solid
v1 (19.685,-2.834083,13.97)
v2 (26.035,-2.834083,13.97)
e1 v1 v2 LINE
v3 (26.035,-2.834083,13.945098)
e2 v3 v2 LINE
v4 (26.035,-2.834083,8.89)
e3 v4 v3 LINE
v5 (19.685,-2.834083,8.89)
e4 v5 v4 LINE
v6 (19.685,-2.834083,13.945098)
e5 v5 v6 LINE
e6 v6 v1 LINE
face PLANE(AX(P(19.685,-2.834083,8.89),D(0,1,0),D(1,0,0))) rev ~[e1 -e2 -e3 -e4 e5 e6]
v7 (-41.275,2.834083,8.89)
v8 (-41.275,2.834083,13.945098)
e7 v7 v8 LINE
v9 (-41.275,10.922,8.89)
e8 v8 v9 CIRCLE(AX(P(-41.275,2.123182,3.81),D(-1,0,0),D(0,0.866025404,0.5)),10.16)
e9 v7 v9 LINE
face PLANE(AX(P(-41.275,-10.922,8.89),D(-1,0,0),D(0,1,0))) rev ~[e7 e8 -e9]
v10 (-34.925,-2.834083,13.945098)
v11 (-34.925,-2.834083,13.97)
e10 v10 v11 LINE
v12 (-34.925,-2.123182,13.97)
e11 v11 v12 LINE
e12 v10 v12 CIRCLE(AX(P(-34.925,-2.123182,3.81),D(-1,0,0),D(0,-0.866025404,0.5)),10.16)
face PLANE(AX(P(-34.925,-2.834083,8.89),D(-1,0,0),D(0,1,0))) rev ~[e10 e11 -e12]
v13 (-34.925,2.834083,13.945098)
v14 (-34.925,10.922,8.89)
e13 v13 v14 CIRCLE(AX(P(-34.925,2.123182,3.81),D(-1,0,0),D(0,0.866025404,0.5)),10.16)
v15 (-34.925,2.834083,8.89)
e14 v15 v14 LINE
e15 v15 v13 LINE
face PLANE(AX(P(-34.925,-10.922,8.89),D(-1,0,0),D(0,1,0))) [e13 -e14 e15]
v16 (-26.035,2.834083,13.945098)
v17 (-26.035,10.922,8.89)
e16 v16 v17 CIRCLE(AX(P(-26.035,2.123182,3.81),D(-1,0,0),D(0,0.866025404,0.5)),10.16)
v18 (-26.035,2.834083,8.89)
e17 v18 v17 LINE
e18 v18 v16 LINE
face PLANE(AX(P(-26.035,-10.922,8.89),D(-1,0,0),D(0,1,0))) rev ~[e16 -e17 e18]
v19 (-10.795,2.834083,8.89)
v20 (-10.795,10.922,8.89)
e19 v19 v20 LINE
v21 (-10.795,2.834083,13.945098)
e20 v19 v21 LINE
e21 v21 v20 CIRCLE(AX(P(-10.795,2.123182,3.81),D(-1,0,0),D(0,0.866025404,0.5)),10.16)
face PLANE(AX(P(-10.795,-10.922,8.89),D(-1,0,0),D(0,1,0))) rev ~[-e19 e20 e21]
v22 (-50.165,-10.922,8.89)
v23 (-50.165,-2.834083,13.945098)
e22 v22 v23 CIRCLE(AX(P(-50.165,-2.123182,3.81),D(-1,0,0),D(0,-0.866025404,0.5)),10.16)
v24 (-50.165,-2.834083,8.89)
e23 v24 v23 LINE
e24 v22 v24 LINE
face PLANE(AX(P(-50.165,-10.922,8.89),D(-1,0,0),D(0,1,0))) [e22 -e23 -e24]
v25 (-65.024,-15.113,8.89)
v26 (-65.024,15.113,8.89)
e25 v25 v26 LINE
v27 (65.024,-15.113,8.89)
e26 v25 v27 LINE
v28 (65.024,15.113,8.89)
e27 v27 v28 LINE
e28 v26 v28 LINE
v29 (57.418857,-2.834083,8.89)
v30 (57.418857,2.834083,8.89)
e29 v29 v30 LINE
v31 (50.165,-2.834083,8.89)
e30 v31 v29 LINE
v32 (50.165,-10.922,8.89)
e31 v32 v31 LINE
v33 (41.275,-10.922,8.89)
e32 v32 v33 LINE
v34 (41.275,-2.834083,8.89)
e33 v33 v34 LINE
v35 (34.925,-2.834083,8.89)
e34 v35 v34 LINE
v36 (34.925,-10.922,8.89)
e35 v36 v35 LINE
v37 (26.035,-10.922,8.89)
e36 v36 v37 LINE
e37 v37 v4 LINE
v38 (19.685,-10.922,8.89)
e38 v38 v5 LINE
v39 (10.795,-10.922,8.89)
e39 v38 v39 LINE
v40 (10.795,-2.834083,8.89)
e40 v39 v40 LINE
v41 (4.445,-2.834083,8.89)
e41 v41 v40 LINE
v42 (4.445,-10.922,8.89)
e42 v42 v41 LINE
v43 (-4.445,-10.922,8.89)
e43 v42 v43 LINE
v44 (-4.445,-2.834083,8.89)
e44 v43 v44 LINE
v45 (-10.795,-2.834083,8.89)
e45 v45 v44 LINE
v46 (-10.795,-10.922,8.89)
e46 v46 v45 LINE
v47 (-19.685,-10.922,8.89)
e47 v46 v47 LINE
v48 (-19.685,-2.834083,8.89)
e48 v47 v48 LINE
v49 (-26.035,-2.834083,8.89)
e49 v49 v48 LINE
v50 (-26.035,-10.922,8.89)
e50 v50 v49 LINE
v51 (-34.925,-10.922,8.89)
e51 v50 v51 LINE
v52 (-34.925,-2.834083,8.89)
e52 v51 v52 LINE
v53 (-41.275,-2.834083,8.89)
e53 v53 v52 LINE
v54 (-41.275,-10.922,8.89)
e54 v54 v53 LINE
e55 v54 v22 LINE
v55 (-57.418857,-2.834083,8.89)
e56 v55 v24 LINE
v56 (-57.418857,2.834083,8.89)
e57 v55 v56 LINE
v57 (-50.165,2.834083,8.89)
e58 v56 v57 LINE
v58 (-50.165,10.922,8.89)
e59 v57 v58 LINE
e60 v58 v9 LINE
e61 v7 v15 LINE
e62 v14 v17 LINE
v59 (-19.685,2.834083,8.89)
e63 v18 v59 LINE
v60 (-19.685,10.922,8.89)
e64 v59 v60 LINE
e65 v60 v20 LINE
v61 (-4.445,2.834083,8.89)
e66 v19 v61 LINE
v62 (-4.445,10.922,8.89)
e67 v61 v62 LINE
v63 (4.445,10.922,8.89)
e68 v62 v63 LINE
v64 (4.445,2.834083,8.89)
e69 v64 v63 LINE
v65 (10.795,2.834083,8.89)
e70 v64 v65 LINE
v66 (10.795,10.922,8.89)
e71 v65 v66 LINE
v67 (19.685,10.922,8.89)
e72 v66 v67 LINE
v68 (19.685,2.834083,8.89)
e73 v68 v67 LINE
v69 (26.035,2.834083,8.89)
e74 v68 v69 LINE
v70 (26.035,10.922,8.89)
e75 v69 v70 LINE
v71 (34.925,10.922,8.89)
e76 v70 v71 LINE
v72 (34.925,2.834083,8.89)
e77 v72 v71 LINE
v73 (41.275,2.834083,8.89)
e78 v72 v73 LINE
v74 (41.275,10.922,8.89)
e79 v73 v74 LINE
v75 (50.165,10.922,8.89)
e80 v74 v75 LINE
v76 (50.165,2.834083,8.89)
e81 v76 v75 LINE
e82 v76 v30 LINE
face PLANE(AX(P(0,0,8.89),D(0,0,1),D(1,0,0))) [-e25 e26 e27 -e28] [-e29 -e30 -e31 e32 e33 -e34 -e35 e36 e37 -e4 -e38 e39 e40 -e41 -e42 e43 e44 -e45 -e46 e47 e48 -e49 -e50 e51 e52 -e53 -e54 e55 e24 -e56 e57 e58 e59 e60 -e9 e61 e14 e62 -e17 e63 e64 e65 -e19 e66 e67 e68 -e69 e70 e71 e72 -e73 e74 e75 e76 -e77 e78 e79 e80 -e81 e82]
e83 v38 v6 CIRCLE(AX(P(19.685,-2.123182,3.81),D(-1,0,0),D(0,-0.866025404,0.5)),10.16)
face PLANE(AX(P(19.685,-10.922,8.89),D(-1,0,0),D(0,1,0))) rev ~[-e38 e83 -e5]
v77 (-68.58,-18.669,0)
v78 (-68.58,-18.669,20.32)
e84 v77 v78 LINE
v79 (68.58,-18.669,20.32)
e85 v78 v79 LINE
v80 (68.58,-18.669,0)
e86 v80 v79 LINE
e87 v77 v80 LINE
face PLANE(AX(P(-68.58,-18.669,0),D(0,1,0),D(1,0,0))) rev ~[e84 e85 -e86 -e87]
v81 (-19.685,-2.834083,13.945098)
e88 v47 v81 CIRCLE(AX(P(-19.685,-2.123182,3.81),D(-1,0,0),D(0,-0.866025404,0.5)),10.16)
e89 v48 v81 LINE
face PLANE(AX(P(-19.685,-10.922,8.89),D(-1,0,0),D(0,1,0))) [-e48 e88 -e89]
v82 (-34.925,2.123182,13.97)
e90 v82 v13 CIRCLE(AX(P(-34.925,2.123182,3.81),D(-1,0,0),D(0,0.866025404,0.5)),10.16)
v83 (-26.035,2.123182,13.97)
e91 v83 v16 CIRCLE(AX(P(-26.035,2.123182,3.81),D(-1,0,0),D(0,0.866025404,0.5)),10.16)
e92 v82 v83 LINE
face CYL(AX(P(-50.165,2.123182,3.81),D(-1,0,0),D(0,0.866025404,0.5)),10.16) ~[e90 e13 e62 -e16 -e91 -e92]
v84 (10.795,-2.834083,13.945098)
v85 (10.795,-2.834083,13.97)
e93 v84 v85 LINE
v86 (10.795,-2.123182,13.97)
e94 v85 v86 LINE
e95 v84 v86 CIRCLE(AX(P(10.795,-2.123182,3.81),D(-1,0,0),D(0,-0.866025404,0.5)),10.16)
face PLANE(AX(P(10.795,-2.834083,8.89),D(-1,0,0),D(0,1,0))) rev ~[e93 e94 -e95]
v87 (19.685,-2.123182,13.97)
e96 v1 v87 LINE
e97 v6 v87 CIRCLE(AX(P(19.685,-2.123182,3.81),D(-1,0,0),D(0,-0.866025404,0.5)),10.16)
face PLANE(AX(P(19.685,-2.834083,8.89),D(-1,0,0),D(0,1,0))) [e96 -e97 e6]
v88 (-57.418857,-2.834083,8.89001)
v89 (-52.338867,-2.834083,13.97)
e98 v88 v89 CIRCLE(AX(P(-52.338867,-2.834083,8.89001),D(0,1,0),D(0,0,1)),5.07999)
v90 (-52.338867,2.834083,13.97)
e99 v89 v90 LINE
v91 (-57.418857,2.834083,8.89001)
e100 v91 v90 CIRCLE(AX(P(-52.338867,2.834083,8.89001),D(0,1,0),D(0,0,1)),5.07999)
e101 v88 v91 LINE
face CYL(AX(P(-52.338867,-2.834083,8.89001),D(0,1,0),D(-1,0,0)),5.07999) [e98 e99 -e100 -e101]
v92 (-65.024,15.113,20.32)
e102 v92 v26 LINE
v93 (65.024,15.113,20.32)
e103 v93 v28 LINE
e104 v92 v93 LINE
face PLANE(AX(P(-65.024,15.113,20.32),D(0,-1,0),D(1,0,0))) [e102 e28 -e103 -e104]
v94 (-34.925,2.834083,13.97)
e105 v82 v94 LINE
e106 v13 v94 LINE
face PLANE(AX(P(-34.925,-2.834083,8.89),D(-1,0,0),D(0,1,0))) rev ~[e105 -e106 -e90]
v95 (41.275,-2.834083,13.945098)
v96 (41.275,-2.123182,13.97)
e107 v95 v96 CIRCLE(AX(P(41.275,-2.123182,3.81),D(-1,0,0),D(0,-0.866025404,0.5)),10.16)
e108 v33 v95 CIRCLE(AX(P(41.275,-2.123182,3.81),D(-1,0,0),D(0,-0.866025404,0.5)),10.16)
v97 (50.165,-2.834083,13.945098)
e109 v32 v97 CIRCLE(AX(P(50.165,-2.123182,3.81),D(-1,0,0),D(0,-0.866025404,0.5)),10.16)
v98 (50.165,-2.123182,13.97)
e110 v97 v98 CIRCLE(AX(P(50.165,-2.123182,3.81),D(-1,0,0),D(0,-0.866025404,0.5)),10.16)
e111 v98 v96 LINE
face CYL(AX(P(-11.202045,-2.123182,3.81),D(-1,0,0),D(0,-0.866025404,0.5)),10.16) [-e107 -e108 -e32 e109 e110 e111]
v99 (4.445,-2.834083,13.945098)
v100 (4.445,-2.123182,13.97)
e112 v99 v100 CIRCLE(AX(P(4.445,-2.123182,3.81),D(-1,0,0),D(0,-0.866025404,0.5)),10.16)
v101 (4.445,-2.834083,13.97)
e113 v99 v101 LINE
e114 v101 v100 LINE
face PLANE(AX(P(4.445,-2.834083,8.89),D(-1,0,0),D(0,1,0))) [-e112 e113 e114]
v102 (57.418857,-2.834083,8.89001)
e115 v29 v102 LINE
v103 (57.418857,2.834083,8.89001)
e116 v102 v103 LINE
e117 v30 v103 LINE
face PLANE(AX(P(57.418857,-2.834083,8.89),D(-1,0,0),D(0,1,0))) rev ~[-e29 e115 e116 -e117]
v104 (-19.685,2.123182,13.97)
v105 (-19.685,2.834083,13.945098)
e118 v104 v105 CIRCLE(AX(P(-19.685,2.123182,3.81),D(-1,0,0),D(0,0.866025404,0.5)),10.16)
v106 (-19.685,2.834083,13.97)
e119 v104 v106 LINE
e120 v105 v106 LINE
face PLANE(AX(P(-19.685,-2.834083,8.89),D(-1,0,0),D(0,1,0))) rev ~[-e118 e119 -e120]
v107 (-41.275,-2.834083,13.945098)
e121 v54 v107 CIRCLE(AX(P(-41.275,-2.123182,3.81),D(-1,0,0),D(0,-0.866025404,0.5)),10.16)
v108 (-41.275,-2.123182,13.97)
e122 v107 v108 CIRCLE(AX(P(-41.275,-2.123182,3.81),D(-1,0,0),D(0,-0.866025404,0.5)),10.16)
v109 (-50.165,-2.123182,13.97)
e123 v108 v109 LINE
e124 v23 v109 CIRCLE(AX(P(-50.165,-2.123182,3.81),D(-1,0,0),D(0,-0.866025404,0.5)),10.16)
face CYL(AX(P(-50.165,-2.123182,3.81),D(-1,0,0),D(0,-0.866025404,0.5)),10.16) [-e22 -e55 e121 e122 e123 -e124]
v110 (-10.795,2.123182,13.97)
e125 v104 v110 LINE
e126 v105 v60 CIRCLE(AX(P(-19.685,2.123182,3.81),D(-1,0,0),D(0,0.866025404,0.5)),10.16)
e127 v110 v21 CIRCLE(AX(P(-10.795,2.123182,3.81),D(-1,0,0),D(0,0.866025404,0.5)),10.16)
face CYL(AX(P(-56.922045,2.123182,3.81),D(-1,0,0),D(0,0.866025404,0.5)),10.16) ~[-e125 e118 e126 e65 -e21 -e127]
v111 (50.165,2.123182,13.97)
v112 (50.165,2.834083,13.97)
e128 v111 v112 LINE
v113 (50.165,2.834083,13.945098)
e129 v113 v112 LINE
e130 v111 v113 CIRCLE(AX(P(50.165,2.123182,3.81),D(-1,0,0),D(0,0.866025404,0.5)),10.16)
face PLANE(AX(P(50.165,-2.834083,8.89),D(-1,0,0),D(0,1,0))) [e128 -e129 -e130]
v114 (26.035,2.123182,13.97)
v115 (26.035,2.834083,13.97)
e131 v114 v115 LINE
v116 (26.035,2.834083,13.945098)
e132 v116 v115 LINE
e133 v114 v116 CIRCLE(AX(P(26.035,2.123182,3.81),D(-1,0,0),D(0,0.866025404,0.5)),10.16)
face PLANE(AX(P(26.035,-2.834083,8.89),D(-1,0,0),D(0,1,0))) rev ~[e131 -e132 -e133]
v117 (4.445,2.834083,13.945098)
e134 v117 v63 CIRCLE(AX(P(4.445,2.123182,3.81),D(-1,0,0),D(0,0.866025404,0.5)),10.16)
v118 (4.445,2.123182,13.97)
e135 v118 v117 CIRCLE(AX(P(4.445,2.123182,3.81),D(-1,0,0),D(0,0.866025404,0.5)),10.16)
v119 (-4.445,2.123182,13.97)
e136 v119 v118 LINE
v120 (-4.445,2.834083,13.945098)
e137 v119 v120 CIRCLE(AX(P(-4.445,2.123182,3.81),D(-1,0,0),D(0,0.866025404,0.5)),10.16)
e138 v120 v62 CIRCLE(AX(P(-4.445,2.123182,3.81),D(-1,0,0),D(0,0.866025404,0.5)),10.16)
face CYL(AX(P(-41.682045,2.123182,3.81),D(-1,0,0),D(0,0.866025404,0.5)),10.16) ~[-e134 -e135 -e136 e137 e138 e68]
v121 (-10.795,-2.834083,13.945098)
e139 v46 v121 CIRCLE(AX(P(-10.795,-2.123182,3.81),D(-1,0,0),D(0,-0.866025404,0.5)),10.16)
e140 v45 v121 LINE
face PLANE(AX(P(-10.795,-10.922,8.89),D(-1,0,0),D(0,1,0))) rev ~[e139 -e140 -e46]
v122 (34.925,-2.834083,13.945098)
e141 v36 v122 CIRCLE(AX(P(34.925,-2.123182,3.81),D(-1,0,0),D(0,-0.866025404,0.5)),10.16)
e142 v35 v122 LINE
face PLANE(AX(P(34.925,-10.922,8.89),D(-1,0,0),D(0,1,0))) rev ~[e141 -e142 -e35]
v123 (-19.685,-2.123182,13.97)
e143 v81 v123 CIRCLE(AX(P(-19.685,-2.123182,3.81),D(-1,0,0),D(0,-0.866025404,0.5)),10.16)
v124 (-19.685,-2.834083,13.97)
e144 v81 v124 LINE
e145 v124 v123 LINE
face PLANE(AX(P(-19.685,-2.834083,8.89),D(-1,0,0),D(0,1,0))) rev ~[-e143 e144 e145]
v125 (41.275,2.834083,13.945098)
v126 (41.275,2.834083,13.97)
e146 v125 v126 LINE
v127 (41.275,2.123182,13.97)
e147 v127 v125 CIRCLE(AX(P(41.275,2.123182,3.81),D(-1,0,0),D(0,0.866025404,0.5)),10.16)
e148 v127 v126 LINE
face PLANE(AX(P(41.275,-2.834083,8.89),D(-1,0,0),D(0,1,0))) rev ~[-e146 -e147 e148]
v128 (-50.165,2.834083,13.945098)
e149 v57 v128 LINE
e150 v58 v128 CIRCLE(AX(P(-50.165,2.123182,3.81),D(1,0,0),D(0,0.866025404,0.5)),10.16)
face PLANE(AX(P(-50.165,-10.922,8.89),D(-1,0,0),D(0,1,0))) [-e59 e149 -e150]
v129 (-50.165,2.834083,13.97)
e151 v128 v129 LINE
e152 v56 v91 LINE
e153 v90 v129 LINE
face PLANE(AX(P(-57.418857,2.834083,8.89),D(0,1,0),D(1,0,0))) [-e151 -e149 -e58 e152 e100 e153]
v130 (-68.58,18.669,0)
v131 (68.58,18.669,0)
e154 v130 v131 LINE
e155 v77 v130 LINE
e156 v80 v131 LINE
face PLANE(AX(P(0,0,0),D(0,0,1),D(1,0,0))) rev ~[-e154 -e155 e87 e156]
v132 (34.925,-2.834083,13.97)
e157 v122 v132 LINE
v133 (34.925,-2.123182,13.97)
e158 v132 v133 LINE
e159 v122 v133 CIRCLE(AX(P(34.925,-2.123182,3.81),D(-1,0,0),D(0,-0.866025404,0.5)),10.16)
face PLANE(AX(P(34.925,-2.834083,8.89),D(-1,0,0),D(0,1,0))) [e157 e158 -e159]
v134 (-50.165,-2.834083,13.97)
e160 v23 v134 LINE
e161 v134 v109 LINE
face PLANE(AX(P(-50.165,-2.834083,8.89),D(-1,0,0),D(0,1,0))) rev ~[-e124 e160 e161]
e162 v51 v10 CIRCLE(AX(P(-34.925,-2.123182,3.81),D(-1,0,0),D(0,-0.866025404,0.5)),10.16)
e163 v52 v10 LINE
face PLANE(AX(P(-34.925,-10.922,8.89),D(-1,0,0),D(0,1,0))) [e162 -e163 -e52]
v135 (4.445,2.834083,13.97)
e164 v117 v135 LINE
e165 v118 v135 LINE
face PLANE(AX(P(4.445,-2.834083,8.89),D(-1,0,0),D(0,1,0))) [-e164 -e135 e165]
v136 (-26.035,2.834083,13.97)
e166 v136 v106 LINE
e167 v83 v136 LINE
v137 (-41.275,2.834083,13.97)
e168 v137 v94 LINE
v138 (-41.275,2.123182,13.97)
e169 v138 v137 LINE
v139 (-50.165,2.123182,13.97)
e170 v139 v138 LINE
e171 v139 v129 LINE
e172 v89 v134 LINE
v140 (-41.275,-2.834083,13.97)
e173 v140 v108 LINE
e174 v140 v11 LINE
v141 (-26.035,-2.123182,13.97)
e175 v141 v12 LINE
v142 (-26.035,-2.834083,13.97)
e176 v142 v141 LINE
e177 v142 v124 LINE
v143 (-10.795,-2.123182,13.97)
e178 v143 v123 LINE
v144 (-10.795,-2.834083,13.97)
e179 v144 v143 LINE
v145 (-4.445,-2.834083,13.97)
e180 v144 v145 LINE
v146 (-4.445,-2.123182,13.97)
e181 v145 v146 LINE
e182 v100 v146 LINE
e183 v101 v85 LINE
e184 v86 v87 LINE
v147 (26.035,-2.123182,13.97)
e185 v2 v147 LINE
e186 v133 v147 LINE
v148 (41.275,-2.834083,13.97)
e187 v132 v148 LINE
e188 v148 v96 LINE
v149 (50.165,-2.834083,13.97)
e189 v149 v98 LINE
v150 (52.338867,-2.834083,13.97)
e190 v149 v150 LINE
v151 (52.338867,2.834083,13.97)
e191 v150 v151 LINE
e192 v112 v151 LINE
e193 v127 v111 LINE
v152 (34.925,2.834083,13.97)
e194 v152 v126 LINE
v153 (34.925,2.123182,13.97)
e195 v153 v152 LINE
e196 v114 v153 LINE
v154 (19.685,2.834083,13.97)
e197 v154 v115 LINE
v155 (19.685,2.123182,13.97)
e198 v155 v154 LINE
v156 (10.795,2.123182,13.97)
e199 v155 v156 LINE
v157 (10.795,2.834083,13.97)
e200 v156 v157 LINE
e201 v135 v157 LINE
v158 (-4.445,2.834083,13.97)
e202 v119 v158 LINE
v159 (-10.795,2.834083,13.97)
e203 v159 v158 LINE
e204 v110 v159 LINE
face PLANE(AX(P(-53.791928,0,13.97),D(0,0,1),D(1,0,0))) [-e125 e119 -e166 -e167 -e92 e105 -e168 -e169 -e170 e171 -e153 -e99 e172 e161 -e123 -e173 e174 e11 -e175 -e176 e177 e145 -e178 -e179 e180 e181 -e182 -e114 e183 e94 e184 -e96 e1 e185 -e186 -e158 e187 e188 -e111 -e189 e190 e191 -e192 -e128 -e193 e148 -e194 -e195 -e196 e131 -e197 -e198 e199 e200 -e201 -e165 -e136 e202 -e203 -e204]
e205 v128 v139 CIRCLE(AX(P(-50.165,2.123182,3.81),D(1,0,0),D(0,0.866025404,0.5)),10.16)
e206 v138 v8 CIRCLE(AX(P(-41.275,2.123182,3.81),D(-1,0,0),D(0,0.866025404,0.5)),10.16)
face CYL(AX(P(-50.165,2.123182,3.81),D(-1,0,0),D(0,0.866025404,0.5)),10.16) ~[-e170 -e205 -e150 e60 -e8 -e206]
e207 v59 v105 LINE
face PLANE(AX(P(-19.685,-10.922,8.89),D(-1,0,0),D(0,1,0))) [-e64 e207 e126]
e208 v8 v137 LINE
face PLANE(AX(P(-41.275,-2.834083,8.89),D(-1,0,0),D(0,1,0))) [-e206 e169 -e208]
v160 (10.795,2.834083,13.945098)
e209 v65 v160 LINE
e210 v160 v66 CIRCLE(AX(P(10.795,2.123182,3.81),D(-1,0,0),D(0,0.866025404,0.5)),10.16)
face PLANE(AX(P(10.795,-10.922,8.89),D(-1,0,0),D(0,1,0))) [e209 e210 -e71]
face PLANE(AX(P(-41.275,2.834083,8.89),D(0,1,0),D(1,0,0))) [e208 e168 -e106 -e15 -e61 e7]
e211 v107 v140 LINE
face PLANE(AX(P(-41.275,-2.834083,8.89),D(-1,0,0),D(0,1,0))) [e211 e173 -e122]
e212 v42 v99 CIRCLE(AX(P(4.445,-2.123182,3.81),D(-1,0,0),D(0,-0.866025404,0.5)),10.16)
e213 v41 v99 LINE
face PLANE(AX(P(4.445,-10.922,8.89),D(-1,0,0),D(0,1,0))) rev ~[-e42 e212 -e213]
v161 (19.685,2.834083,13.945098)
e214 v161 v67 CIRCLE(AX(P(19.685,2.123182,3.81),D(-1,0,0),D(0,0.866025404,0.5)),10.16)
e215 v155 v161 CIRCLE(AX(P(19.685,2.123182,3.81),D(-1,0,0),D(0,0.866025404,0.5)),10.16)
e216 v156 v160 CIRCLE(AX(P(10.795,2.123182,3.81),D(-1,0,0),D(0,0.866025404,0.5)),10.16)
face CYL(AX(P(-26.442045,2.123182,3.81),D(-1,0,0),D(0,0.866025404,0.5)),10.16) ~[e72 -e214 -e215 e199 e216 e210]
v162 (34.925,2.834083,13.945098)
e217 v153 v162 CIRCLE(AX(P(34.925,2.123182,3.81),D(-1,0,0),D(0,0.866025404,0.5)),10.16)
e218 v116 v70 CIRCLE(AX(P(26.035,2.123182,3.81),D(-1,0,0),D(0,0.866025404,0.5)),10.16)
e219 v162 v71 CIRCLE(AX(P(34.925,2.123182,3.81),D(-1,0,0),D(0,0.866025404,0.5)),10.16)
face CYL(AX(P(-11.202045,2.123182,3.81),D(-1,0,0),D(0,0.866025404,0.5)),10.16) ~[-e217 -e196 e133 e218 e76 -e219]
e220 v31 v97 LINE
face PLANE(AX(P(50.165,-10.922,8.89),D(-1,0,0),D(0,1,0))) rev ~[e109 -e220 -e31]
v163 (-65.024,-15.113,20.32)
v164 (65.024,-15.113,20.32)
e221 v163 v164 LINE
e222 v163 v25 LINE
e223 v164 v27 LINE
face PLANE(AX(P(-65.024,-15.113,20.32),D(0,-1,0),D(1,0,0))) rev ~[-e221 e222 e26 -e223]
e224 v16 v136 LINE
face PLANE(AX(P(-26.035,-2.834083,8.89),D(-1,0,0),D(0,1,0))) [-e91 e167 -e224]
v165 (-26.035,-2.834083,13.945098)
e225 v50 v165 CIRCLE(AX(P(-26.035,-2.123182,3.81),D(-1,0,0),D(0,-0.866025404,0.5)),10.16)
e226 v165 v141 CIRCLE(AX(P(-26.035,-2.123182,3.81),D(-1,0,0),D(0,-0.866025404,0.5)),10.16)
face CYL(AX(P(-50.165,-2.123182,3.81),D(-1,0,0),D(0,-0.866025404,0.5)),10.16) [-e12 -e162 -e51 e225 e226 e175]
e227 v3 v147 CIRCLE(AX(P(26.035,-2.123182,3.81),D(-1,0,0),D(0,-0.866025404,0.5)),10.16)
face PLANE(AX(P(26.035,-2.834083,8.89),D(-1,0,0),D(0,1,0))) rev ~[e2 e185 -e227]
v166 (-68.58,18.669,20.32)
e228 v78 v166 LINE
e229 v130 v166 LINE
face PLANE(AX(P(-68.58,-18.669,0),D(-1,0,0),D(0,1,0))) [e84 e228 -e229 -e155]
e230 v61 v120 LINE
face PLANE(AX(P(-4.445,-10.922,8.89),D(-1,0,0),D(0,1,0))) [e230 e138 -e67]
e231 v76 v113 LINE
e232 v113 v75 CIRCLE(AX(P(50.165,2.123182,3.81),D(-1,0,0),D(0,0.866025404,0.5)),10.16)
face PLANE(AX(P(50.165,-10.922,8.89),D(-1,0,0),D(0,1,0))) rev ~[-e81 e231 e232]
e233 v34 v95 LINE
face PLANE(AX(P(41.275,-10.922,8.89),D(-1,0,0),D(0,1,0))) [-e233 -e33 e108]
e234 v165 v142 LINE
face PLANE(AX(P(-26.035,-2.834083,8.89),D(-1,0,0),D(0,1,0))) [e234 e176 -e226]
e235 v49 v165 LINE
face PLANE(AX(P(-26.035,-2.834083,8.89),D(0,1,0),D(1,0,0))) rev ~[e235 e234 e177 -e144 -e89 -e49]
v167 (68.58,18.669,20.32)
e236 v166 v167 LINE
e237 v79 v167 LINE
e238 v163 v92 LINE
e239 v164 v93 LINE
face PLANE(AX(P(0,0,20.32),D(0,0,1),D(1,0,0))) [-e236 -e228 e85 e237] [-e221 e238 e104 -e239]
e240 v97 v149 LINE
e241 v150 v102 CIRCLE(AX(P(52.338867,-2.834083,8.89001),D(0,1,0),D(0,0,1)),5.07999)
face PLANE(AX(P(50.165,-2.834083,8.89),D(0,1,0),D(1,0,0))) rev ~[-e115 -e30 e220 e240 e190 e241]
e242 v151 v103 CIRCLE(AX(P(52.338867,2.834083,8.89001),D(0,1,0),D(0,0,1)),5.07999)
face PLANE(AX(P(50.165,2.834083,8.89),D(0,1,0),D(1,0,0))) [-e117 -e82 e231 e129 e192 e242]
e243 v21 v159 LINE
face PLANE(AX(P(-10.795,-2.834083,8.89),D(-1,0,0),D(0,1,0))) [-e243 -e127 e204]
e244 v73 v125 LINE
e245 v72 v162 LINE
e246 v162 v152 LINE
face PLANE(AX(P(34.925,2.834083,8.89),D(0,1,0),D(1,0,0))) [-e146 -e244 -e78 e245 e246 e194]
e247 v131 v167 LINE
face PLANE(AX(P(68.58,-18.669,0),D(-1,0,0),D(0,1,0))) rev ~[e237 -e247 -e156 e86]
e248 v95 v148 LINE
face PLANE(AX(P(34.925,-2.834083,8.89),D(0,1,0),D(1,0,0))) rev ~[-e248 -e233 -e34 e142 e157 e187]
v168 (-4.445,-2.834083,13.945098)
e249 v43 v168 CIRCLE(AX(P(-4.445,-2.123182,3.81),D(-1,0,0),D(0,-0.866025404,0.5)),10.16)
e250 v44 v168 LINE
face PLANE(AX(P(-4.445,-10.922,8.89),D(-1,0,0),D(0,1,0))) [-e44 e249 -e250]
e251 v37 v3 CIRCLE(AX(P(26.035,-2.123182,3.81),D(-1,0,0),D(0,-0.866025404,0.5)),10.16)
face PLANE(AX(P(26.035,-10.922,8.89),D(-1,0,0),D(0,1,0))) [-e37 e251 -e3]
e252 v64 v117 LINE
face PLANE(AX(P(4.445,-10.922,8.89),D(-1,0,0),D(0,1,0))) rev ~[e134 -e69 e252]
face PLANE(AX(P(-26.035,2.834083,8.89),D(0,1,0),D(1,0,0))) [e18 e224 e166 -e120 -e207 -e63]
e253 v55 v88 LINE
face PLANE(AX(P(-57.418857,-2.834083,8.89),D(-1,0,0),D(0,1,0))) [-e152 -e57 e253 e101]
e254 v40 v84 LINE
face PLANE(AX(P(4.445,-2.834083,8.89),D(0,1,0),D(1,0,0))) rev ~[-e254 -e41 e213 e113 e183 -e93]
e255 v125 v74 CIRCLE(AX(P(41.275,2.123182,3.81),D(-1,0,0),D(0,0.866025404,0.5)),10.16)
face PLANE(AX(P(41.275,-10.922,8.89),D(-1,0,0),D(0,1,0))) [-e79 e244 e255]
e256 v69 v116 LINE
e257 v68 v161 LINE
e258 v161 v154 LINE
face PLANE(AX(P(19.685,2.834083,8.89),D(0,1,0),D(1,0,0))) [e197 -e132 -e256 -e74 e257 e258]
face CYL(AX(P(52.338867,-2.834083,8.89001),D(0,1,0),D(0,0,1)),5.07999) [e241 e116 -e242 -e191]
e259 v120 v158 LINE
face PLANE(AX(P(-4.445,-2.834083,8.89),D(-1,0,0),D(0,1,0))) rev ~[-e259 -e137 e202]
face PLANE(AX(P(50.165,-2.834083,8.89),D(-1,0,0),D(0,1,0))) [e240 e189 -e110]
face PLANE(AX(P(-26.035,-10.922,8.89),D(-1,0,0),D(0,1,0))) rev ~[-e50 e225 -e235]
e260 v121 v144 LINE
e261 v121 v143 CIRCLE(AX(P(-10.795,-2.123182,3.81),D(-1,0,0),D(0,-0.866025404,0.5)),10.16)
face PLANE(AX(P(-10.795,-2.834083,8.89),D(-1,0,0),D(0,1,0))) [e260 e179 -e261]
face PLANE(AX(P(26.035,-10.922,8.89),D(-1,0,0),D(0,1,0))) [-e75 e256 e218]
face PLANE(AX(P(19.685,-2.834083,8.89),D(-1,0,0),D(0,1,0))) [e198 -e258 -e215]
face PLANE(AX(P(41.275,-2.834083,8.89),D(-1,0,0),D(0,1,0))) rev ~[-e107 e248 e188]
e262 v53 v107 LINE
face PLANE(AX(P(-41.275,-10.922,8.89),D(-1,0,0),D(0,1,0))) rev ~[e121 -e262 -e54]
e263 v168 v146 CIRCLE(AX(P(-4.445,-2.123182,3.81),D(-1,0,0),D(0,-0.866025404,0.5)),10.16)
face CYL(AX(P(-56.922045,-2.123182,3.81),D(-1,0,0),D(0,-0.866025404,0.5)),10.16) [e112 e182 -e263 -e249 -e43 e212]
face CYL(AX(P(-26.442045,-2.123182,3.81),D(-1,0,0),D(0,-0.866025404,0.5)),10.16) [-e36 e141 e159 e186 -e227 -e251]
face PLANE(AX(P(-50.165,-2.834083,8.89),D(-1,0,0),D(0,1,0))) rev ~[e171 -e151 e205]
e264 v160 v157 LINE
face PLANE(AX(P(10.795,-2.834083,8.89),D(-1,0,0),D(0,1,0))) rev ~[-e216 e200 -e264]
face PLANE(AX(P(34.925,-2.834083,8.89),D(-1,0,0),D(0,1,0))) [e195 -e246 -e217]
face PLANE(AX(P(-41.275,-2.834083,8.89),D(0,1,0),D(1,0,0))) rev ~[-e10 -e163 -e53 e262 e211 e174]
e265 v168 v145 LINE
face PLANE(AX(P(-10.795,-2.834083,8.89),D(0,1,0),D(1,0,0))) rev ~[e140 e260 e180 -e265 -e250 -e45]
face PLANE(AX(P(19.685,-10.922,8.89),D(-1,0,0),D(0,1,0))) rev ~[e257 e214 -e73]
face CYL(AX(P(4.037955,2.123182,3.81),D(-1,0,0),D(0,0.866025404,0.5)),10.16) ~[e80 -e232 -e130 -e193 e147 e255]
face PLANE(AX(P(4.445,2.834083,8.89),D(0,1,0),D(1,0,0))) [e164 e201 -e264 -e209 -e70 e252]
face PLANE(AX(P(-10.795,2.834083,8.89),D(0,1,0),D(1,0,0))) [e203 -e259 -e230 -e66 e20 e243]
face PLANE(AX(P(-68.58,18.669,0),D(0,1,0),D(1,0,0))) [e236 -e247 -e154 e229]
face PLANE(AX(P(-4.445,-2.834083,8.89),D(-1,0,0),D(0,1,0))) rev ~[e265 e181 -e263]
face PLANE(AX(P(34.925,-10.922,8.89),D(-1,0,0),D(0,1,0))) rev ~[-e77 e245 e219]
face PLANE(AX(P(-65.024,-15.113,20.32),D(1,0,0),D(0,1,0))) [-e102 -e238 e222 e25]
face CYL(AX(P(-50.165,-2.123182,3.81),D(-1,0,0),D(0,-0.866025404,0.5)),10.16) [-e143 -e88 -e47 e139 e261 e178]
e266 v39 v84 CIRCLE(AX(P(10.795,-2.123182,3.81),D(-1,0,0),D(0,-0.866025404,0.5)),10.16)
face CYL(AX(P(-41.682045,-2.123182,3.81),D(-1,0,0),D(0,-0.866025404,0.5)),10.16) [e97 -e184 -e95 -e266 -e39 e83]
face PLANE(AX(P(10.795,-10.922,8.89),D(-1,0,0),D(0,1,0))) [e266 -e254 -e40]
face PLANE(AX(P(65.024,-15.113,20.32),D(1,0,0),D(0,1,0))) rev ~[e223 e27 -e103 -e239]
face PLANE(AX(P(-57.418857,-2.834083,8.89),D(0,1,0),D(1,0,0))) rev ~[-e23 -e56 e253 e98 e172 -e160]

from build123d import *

# Parameters (mm, degrees)
F0_W         = 137.16
F0_H         = 37.338
F1_DEPTH     = 20.32
F2_W         = 130.048
F2_H         = 30.226
F3_DEPTH     = 11.43
F4_W         = 8.89
F4_H         = 21.844
F5_DEPTH     = 5.08
F6_T1_DEPTH  = 30.8870452561
F6_T3_DEPTH  = 52.8840905123
F6_T5_DEPTH  = 52.8840905123
F6_T7_DEPTH  = 52.8840905123
F6_T9_DEPTH  = 52.8840905123
F6_T11_DEPTH = 52.8840905123
F6_T13_DEPTH = 30.8870452561
F7_W         = 7.2538567698
F7_H         = 5.6681656279
F7_W_2       = 6.35
F8_DEPTH     = 5.08
F9_R         = 5.07999


# Not quite as in the source:
# - a fillet or chamfer that OpenCascade refuses, or shapes differently, is made with other operations: its cross-section is extruded or revolved along the edge and cut away or added
# - a fillet or chamfer is up to 0.001 mm smaller than in the source, because OpenCascade refuses the exact size
# - a feature names something its author has since deleted; it is built from what else it names


with BuildPart() as f1:
    # F0 (on Top) → F1 (new body)
    with BuildSketch(Plane.XY):
        Rectangle(F0_W, F0_H)
    extrude(amount=F1_DEPTH)

    # F2 (on face) → F3 (cut)
    with BuildSketch(Plane.XY.offset(20.32)):
        Rectangle(F2_W, F2_H)
    extrude(amount=-F3_DEPTH, mode=Mode.SUBTRACT)

    # F4 (on face) → F5 (join)
    with BuildSketch(Plane.XY.offset(8.89)):
        Rectangle(F4_W, F4_H)
        with Locations((15.24, 0)):
            Rectangle(F4_W, F4_H)
        with Locations((30.48, 0)):
            Rectangle(F4_W, F4_H)
        with Locations((45.72, 0)):
            Rectangle(F4_W, F4_H)
        with Locations((-15.24, 0)):
            Rectangle(F4_W, F4_H)
        with Locations((-30.48, 0)):
            Rectangle(F4_W, F4_H)
        with Locations((-45.72, 0)):
            Rectangle(F4_W, F4_H)
    extrude(amount=F5_DEPTH)

    # F6: fillet of radius 10.16 on 14 edges, made by hand

    # F6_s2 → F6_t1 (cut)
    with BuildSketch(Plane.YZ.offset(-50.165)):
        with BuildLine():
            ThreePointArc((-10.922, 8.89), (-7.2031818975, 12.6088181024), (-2.1231818975, 13.97))
            Line((-2.1231818975, 13.97), (-10.922, 13.97))
            Line((-10.922, 13.97), (-10.922, 8.89))
        make_face()
        with BuildLine():
            ThreePointArc((10.922, 8.89), (7.2031818975, 12.6088181024), (2.1231818975, 13.97))
            Line((2.1231818975, 13.97), (10.922, 13.97))
            Line((10.922, 13.97), (10.922, 8.89))
        make_face()
    extrude(amount=F6_T1_DEPTH, mode=Mode.SUBTRACT)

    # F6_s4 → F6_t3 (cut)
    with BuildSketch(Plane.YZ.offset(-56.9220452561)):
        with BuildLine():
            ThreePointArc((-10.922, 8.89), (-7.2031818975, 12.6088181024), (-2.1231818975, 13.97))
            Line((-2.1231818975, 13.97), (-10.922, 13.97))
            Line((-10.922, 13.97), (-10.922, 8.89))
        make_face()
        with BuildLine():
            ThreePointArc((10.922, 8.89), (7.2031818975, 12.6088181024), (2.1231818975, 13.97))
            Line((2.1231818975, 13.97), (10.922, 13.97))
            Line((10.922, 13.97), (10.922, 8.89))
        make_face()
    extrude(amount=F6_T3_DEPTH, mode=Mode.SUBTRACT)

    # F6_s6 → F6_t5 (cut)
    with BuildSketch(Plane.YZ.offset(-41.6820452561)):
        with BuildLine():
            ThreePointArc((-10.922, 8.89), (-7.2031818975, 12.6088181024), (-2.1231818975, 13.97))
            Line((-2.1231818975, 13.97), (-10.922, 13.97))
            Line((-10.922, 13.97), (-10.922, 8.89))
        make_face()
        with BuildLine():
            ThreePointArc((10.922, 8.89), (7.2031818975, 12.6088181024), (2.1231818975, 13.97))
            Line((2.1231818975, 13.97), (10.922, 13.97))
            Line((10.922, 13.97), (10.922, 8.89))
        make_face()
    extrude(amount=F6_T5_DEPTH, mode=Mode.SUBTRACT)

    # F6_s8 → F6_t7 (cut)
    with BuildSketch(Plane.YZ.offset(-26.4420452561)):
        with BuildLine():
            ThreePointArc((-10.922, 8.89), (-7.2031818975, 12.6088181024), (-2.1231818975, 13.97))
            Line((-2.1231818975, 13.97), (-10.922, 13.97))
            Line((-10.922, 13.97), (-10.922, 8.89))
        make_face()
        with BuildLine():
            ThreePointArc((10.922, 8.89), (7.2031818975, 12.6088181024), (2.1231818975, 13.97))
            Line((2.1231818975, 13.97), (10.922, 13.97))
            Line((10.922, 13.97), (10.922, 8.89))
        make_face()
    extrude(amount=F6_T7_DEPTH, mode=Mode.SUBTRACT)

    # F6_s10 → F6_t9 (cut)
    with BuildSketch(Plane.YZ.offset(-11.2020452561)):
        with BuildLine():
            ThreePointArc((-10.922, 8.89), (-7.2031818975, 12.6088181024), (-2.1231818975, 13.97))
            Line((-2.1231818975, 13.97), (-10.922, 13.97))
            Line((-10.922, 13.97), (-10.922, 8.89))
        make_face()
        with BuildLine():
            ThreePointArc((10.922, 8.89), (7.2031818975, 12.6088181024), (2.1231818975, 13.97))
            Line((2.1231818975, 13.97), (10.922, 13.97))
            Line((10.922, 13.97), (10.922, 8.89))
        make_face()
    extrude(amount=F6_T9_DEPTH, mode=Mode.SUBTRACT)

    # F6_s12 → F6_t11 (cut)
    with BuildSketch(Plane.YZ.offset(4.0379547439)):
        with BuildLine():
            ThreePointArc((-10.922, 8.89), (-7.2031818975, 12.6088181024), (-2.1231818975, 13.97))
            Line((-2.1231818975, 13.97), (-10.922, 13.97))
            Line((-10.922, 13.97), (-10.922, 8.89))
        make_face()
        with BuildLine():
            ThreePointArc((10.922, 8.89), (7.2031818975, 12.6088181024), (2.1231818975, 13.97))
            Line((2.1231818975, 13.97), (10.922, 13.97))
            Line((10.922, 13.97), (10.922, 8.89))
        make_face()
    extrude(amount=F6_T11_DEPTH, mode=Mode.SUBTRACT)

    # F6_s14 → F6_t13 (cut)
    with BuildSketch(Plane.YZ.offset(19.2779547439)):
        with BuildLine():
            ThreePointArc((-10.922, 8.89), (-7.2031818975, 12.6088181024), (-2.1231818975, 13.97))
            Line((-2.1231818975, 13.97), (-10.922, 13.97))
            Line((-10.922, 13.97), (-10.922, 8.89))
        make_face()
        with BuildLine():
            ThreePointArc((10.922, 8.89), (7.2031818975, 12.6088181024), (2.1231818975, 13.97))
            Line((2.1231818975, 13.97), (10.922, 13.97))
            Line((10.922, 13.97), (10.922, 8.89))
        make_face()
    extrude(amount=F6_T13_DEPTH, mode=Mode.SUBTRACT)

    # F7 (on face) → F8 (join)
    with BuildSketch(Plane.XY.offset(8.89)):
        with Locations((-53.7919283849, 0)):
            Rectangle(F7_W, F7_H)
        with Locations((-38.1, 0)):
            Rectangle(F7_W_2, F7_H)
        with Locations((-22.86, 0)):
            Rectangle(F7_W_2, F7_H)
        with Locations((-7.62, 0)):
            Rectangle(F7_W_2, F7_H)
        with Locations((7.62, 0)):
            Rectangle(F7_W_2, F7_H)
        with Locations((22.86, 0)):
            Rectangle(F7_W_2, F7_H)
        with Locations((38.1, 0)):
            Rectangle(F7_W_2, F7_H)
        with Locations((53.7919283849, 0)):
            Rectangle(F7_W, F7_H)
    extrude(amount=F8_DEPTH)

    # F9 (radius 5.08 in the source; OpenCascade refuses exactly that, so slightly less here)
    f9_edges = [f1.edges().sort_by_distance(p)[0] for p in [
        (-57.418857, 0, 13.97),
        (57.418857, 0, 13.97),
    ]]
    fillet(f9_edges, radius=F9_R)


solid = f1.part
